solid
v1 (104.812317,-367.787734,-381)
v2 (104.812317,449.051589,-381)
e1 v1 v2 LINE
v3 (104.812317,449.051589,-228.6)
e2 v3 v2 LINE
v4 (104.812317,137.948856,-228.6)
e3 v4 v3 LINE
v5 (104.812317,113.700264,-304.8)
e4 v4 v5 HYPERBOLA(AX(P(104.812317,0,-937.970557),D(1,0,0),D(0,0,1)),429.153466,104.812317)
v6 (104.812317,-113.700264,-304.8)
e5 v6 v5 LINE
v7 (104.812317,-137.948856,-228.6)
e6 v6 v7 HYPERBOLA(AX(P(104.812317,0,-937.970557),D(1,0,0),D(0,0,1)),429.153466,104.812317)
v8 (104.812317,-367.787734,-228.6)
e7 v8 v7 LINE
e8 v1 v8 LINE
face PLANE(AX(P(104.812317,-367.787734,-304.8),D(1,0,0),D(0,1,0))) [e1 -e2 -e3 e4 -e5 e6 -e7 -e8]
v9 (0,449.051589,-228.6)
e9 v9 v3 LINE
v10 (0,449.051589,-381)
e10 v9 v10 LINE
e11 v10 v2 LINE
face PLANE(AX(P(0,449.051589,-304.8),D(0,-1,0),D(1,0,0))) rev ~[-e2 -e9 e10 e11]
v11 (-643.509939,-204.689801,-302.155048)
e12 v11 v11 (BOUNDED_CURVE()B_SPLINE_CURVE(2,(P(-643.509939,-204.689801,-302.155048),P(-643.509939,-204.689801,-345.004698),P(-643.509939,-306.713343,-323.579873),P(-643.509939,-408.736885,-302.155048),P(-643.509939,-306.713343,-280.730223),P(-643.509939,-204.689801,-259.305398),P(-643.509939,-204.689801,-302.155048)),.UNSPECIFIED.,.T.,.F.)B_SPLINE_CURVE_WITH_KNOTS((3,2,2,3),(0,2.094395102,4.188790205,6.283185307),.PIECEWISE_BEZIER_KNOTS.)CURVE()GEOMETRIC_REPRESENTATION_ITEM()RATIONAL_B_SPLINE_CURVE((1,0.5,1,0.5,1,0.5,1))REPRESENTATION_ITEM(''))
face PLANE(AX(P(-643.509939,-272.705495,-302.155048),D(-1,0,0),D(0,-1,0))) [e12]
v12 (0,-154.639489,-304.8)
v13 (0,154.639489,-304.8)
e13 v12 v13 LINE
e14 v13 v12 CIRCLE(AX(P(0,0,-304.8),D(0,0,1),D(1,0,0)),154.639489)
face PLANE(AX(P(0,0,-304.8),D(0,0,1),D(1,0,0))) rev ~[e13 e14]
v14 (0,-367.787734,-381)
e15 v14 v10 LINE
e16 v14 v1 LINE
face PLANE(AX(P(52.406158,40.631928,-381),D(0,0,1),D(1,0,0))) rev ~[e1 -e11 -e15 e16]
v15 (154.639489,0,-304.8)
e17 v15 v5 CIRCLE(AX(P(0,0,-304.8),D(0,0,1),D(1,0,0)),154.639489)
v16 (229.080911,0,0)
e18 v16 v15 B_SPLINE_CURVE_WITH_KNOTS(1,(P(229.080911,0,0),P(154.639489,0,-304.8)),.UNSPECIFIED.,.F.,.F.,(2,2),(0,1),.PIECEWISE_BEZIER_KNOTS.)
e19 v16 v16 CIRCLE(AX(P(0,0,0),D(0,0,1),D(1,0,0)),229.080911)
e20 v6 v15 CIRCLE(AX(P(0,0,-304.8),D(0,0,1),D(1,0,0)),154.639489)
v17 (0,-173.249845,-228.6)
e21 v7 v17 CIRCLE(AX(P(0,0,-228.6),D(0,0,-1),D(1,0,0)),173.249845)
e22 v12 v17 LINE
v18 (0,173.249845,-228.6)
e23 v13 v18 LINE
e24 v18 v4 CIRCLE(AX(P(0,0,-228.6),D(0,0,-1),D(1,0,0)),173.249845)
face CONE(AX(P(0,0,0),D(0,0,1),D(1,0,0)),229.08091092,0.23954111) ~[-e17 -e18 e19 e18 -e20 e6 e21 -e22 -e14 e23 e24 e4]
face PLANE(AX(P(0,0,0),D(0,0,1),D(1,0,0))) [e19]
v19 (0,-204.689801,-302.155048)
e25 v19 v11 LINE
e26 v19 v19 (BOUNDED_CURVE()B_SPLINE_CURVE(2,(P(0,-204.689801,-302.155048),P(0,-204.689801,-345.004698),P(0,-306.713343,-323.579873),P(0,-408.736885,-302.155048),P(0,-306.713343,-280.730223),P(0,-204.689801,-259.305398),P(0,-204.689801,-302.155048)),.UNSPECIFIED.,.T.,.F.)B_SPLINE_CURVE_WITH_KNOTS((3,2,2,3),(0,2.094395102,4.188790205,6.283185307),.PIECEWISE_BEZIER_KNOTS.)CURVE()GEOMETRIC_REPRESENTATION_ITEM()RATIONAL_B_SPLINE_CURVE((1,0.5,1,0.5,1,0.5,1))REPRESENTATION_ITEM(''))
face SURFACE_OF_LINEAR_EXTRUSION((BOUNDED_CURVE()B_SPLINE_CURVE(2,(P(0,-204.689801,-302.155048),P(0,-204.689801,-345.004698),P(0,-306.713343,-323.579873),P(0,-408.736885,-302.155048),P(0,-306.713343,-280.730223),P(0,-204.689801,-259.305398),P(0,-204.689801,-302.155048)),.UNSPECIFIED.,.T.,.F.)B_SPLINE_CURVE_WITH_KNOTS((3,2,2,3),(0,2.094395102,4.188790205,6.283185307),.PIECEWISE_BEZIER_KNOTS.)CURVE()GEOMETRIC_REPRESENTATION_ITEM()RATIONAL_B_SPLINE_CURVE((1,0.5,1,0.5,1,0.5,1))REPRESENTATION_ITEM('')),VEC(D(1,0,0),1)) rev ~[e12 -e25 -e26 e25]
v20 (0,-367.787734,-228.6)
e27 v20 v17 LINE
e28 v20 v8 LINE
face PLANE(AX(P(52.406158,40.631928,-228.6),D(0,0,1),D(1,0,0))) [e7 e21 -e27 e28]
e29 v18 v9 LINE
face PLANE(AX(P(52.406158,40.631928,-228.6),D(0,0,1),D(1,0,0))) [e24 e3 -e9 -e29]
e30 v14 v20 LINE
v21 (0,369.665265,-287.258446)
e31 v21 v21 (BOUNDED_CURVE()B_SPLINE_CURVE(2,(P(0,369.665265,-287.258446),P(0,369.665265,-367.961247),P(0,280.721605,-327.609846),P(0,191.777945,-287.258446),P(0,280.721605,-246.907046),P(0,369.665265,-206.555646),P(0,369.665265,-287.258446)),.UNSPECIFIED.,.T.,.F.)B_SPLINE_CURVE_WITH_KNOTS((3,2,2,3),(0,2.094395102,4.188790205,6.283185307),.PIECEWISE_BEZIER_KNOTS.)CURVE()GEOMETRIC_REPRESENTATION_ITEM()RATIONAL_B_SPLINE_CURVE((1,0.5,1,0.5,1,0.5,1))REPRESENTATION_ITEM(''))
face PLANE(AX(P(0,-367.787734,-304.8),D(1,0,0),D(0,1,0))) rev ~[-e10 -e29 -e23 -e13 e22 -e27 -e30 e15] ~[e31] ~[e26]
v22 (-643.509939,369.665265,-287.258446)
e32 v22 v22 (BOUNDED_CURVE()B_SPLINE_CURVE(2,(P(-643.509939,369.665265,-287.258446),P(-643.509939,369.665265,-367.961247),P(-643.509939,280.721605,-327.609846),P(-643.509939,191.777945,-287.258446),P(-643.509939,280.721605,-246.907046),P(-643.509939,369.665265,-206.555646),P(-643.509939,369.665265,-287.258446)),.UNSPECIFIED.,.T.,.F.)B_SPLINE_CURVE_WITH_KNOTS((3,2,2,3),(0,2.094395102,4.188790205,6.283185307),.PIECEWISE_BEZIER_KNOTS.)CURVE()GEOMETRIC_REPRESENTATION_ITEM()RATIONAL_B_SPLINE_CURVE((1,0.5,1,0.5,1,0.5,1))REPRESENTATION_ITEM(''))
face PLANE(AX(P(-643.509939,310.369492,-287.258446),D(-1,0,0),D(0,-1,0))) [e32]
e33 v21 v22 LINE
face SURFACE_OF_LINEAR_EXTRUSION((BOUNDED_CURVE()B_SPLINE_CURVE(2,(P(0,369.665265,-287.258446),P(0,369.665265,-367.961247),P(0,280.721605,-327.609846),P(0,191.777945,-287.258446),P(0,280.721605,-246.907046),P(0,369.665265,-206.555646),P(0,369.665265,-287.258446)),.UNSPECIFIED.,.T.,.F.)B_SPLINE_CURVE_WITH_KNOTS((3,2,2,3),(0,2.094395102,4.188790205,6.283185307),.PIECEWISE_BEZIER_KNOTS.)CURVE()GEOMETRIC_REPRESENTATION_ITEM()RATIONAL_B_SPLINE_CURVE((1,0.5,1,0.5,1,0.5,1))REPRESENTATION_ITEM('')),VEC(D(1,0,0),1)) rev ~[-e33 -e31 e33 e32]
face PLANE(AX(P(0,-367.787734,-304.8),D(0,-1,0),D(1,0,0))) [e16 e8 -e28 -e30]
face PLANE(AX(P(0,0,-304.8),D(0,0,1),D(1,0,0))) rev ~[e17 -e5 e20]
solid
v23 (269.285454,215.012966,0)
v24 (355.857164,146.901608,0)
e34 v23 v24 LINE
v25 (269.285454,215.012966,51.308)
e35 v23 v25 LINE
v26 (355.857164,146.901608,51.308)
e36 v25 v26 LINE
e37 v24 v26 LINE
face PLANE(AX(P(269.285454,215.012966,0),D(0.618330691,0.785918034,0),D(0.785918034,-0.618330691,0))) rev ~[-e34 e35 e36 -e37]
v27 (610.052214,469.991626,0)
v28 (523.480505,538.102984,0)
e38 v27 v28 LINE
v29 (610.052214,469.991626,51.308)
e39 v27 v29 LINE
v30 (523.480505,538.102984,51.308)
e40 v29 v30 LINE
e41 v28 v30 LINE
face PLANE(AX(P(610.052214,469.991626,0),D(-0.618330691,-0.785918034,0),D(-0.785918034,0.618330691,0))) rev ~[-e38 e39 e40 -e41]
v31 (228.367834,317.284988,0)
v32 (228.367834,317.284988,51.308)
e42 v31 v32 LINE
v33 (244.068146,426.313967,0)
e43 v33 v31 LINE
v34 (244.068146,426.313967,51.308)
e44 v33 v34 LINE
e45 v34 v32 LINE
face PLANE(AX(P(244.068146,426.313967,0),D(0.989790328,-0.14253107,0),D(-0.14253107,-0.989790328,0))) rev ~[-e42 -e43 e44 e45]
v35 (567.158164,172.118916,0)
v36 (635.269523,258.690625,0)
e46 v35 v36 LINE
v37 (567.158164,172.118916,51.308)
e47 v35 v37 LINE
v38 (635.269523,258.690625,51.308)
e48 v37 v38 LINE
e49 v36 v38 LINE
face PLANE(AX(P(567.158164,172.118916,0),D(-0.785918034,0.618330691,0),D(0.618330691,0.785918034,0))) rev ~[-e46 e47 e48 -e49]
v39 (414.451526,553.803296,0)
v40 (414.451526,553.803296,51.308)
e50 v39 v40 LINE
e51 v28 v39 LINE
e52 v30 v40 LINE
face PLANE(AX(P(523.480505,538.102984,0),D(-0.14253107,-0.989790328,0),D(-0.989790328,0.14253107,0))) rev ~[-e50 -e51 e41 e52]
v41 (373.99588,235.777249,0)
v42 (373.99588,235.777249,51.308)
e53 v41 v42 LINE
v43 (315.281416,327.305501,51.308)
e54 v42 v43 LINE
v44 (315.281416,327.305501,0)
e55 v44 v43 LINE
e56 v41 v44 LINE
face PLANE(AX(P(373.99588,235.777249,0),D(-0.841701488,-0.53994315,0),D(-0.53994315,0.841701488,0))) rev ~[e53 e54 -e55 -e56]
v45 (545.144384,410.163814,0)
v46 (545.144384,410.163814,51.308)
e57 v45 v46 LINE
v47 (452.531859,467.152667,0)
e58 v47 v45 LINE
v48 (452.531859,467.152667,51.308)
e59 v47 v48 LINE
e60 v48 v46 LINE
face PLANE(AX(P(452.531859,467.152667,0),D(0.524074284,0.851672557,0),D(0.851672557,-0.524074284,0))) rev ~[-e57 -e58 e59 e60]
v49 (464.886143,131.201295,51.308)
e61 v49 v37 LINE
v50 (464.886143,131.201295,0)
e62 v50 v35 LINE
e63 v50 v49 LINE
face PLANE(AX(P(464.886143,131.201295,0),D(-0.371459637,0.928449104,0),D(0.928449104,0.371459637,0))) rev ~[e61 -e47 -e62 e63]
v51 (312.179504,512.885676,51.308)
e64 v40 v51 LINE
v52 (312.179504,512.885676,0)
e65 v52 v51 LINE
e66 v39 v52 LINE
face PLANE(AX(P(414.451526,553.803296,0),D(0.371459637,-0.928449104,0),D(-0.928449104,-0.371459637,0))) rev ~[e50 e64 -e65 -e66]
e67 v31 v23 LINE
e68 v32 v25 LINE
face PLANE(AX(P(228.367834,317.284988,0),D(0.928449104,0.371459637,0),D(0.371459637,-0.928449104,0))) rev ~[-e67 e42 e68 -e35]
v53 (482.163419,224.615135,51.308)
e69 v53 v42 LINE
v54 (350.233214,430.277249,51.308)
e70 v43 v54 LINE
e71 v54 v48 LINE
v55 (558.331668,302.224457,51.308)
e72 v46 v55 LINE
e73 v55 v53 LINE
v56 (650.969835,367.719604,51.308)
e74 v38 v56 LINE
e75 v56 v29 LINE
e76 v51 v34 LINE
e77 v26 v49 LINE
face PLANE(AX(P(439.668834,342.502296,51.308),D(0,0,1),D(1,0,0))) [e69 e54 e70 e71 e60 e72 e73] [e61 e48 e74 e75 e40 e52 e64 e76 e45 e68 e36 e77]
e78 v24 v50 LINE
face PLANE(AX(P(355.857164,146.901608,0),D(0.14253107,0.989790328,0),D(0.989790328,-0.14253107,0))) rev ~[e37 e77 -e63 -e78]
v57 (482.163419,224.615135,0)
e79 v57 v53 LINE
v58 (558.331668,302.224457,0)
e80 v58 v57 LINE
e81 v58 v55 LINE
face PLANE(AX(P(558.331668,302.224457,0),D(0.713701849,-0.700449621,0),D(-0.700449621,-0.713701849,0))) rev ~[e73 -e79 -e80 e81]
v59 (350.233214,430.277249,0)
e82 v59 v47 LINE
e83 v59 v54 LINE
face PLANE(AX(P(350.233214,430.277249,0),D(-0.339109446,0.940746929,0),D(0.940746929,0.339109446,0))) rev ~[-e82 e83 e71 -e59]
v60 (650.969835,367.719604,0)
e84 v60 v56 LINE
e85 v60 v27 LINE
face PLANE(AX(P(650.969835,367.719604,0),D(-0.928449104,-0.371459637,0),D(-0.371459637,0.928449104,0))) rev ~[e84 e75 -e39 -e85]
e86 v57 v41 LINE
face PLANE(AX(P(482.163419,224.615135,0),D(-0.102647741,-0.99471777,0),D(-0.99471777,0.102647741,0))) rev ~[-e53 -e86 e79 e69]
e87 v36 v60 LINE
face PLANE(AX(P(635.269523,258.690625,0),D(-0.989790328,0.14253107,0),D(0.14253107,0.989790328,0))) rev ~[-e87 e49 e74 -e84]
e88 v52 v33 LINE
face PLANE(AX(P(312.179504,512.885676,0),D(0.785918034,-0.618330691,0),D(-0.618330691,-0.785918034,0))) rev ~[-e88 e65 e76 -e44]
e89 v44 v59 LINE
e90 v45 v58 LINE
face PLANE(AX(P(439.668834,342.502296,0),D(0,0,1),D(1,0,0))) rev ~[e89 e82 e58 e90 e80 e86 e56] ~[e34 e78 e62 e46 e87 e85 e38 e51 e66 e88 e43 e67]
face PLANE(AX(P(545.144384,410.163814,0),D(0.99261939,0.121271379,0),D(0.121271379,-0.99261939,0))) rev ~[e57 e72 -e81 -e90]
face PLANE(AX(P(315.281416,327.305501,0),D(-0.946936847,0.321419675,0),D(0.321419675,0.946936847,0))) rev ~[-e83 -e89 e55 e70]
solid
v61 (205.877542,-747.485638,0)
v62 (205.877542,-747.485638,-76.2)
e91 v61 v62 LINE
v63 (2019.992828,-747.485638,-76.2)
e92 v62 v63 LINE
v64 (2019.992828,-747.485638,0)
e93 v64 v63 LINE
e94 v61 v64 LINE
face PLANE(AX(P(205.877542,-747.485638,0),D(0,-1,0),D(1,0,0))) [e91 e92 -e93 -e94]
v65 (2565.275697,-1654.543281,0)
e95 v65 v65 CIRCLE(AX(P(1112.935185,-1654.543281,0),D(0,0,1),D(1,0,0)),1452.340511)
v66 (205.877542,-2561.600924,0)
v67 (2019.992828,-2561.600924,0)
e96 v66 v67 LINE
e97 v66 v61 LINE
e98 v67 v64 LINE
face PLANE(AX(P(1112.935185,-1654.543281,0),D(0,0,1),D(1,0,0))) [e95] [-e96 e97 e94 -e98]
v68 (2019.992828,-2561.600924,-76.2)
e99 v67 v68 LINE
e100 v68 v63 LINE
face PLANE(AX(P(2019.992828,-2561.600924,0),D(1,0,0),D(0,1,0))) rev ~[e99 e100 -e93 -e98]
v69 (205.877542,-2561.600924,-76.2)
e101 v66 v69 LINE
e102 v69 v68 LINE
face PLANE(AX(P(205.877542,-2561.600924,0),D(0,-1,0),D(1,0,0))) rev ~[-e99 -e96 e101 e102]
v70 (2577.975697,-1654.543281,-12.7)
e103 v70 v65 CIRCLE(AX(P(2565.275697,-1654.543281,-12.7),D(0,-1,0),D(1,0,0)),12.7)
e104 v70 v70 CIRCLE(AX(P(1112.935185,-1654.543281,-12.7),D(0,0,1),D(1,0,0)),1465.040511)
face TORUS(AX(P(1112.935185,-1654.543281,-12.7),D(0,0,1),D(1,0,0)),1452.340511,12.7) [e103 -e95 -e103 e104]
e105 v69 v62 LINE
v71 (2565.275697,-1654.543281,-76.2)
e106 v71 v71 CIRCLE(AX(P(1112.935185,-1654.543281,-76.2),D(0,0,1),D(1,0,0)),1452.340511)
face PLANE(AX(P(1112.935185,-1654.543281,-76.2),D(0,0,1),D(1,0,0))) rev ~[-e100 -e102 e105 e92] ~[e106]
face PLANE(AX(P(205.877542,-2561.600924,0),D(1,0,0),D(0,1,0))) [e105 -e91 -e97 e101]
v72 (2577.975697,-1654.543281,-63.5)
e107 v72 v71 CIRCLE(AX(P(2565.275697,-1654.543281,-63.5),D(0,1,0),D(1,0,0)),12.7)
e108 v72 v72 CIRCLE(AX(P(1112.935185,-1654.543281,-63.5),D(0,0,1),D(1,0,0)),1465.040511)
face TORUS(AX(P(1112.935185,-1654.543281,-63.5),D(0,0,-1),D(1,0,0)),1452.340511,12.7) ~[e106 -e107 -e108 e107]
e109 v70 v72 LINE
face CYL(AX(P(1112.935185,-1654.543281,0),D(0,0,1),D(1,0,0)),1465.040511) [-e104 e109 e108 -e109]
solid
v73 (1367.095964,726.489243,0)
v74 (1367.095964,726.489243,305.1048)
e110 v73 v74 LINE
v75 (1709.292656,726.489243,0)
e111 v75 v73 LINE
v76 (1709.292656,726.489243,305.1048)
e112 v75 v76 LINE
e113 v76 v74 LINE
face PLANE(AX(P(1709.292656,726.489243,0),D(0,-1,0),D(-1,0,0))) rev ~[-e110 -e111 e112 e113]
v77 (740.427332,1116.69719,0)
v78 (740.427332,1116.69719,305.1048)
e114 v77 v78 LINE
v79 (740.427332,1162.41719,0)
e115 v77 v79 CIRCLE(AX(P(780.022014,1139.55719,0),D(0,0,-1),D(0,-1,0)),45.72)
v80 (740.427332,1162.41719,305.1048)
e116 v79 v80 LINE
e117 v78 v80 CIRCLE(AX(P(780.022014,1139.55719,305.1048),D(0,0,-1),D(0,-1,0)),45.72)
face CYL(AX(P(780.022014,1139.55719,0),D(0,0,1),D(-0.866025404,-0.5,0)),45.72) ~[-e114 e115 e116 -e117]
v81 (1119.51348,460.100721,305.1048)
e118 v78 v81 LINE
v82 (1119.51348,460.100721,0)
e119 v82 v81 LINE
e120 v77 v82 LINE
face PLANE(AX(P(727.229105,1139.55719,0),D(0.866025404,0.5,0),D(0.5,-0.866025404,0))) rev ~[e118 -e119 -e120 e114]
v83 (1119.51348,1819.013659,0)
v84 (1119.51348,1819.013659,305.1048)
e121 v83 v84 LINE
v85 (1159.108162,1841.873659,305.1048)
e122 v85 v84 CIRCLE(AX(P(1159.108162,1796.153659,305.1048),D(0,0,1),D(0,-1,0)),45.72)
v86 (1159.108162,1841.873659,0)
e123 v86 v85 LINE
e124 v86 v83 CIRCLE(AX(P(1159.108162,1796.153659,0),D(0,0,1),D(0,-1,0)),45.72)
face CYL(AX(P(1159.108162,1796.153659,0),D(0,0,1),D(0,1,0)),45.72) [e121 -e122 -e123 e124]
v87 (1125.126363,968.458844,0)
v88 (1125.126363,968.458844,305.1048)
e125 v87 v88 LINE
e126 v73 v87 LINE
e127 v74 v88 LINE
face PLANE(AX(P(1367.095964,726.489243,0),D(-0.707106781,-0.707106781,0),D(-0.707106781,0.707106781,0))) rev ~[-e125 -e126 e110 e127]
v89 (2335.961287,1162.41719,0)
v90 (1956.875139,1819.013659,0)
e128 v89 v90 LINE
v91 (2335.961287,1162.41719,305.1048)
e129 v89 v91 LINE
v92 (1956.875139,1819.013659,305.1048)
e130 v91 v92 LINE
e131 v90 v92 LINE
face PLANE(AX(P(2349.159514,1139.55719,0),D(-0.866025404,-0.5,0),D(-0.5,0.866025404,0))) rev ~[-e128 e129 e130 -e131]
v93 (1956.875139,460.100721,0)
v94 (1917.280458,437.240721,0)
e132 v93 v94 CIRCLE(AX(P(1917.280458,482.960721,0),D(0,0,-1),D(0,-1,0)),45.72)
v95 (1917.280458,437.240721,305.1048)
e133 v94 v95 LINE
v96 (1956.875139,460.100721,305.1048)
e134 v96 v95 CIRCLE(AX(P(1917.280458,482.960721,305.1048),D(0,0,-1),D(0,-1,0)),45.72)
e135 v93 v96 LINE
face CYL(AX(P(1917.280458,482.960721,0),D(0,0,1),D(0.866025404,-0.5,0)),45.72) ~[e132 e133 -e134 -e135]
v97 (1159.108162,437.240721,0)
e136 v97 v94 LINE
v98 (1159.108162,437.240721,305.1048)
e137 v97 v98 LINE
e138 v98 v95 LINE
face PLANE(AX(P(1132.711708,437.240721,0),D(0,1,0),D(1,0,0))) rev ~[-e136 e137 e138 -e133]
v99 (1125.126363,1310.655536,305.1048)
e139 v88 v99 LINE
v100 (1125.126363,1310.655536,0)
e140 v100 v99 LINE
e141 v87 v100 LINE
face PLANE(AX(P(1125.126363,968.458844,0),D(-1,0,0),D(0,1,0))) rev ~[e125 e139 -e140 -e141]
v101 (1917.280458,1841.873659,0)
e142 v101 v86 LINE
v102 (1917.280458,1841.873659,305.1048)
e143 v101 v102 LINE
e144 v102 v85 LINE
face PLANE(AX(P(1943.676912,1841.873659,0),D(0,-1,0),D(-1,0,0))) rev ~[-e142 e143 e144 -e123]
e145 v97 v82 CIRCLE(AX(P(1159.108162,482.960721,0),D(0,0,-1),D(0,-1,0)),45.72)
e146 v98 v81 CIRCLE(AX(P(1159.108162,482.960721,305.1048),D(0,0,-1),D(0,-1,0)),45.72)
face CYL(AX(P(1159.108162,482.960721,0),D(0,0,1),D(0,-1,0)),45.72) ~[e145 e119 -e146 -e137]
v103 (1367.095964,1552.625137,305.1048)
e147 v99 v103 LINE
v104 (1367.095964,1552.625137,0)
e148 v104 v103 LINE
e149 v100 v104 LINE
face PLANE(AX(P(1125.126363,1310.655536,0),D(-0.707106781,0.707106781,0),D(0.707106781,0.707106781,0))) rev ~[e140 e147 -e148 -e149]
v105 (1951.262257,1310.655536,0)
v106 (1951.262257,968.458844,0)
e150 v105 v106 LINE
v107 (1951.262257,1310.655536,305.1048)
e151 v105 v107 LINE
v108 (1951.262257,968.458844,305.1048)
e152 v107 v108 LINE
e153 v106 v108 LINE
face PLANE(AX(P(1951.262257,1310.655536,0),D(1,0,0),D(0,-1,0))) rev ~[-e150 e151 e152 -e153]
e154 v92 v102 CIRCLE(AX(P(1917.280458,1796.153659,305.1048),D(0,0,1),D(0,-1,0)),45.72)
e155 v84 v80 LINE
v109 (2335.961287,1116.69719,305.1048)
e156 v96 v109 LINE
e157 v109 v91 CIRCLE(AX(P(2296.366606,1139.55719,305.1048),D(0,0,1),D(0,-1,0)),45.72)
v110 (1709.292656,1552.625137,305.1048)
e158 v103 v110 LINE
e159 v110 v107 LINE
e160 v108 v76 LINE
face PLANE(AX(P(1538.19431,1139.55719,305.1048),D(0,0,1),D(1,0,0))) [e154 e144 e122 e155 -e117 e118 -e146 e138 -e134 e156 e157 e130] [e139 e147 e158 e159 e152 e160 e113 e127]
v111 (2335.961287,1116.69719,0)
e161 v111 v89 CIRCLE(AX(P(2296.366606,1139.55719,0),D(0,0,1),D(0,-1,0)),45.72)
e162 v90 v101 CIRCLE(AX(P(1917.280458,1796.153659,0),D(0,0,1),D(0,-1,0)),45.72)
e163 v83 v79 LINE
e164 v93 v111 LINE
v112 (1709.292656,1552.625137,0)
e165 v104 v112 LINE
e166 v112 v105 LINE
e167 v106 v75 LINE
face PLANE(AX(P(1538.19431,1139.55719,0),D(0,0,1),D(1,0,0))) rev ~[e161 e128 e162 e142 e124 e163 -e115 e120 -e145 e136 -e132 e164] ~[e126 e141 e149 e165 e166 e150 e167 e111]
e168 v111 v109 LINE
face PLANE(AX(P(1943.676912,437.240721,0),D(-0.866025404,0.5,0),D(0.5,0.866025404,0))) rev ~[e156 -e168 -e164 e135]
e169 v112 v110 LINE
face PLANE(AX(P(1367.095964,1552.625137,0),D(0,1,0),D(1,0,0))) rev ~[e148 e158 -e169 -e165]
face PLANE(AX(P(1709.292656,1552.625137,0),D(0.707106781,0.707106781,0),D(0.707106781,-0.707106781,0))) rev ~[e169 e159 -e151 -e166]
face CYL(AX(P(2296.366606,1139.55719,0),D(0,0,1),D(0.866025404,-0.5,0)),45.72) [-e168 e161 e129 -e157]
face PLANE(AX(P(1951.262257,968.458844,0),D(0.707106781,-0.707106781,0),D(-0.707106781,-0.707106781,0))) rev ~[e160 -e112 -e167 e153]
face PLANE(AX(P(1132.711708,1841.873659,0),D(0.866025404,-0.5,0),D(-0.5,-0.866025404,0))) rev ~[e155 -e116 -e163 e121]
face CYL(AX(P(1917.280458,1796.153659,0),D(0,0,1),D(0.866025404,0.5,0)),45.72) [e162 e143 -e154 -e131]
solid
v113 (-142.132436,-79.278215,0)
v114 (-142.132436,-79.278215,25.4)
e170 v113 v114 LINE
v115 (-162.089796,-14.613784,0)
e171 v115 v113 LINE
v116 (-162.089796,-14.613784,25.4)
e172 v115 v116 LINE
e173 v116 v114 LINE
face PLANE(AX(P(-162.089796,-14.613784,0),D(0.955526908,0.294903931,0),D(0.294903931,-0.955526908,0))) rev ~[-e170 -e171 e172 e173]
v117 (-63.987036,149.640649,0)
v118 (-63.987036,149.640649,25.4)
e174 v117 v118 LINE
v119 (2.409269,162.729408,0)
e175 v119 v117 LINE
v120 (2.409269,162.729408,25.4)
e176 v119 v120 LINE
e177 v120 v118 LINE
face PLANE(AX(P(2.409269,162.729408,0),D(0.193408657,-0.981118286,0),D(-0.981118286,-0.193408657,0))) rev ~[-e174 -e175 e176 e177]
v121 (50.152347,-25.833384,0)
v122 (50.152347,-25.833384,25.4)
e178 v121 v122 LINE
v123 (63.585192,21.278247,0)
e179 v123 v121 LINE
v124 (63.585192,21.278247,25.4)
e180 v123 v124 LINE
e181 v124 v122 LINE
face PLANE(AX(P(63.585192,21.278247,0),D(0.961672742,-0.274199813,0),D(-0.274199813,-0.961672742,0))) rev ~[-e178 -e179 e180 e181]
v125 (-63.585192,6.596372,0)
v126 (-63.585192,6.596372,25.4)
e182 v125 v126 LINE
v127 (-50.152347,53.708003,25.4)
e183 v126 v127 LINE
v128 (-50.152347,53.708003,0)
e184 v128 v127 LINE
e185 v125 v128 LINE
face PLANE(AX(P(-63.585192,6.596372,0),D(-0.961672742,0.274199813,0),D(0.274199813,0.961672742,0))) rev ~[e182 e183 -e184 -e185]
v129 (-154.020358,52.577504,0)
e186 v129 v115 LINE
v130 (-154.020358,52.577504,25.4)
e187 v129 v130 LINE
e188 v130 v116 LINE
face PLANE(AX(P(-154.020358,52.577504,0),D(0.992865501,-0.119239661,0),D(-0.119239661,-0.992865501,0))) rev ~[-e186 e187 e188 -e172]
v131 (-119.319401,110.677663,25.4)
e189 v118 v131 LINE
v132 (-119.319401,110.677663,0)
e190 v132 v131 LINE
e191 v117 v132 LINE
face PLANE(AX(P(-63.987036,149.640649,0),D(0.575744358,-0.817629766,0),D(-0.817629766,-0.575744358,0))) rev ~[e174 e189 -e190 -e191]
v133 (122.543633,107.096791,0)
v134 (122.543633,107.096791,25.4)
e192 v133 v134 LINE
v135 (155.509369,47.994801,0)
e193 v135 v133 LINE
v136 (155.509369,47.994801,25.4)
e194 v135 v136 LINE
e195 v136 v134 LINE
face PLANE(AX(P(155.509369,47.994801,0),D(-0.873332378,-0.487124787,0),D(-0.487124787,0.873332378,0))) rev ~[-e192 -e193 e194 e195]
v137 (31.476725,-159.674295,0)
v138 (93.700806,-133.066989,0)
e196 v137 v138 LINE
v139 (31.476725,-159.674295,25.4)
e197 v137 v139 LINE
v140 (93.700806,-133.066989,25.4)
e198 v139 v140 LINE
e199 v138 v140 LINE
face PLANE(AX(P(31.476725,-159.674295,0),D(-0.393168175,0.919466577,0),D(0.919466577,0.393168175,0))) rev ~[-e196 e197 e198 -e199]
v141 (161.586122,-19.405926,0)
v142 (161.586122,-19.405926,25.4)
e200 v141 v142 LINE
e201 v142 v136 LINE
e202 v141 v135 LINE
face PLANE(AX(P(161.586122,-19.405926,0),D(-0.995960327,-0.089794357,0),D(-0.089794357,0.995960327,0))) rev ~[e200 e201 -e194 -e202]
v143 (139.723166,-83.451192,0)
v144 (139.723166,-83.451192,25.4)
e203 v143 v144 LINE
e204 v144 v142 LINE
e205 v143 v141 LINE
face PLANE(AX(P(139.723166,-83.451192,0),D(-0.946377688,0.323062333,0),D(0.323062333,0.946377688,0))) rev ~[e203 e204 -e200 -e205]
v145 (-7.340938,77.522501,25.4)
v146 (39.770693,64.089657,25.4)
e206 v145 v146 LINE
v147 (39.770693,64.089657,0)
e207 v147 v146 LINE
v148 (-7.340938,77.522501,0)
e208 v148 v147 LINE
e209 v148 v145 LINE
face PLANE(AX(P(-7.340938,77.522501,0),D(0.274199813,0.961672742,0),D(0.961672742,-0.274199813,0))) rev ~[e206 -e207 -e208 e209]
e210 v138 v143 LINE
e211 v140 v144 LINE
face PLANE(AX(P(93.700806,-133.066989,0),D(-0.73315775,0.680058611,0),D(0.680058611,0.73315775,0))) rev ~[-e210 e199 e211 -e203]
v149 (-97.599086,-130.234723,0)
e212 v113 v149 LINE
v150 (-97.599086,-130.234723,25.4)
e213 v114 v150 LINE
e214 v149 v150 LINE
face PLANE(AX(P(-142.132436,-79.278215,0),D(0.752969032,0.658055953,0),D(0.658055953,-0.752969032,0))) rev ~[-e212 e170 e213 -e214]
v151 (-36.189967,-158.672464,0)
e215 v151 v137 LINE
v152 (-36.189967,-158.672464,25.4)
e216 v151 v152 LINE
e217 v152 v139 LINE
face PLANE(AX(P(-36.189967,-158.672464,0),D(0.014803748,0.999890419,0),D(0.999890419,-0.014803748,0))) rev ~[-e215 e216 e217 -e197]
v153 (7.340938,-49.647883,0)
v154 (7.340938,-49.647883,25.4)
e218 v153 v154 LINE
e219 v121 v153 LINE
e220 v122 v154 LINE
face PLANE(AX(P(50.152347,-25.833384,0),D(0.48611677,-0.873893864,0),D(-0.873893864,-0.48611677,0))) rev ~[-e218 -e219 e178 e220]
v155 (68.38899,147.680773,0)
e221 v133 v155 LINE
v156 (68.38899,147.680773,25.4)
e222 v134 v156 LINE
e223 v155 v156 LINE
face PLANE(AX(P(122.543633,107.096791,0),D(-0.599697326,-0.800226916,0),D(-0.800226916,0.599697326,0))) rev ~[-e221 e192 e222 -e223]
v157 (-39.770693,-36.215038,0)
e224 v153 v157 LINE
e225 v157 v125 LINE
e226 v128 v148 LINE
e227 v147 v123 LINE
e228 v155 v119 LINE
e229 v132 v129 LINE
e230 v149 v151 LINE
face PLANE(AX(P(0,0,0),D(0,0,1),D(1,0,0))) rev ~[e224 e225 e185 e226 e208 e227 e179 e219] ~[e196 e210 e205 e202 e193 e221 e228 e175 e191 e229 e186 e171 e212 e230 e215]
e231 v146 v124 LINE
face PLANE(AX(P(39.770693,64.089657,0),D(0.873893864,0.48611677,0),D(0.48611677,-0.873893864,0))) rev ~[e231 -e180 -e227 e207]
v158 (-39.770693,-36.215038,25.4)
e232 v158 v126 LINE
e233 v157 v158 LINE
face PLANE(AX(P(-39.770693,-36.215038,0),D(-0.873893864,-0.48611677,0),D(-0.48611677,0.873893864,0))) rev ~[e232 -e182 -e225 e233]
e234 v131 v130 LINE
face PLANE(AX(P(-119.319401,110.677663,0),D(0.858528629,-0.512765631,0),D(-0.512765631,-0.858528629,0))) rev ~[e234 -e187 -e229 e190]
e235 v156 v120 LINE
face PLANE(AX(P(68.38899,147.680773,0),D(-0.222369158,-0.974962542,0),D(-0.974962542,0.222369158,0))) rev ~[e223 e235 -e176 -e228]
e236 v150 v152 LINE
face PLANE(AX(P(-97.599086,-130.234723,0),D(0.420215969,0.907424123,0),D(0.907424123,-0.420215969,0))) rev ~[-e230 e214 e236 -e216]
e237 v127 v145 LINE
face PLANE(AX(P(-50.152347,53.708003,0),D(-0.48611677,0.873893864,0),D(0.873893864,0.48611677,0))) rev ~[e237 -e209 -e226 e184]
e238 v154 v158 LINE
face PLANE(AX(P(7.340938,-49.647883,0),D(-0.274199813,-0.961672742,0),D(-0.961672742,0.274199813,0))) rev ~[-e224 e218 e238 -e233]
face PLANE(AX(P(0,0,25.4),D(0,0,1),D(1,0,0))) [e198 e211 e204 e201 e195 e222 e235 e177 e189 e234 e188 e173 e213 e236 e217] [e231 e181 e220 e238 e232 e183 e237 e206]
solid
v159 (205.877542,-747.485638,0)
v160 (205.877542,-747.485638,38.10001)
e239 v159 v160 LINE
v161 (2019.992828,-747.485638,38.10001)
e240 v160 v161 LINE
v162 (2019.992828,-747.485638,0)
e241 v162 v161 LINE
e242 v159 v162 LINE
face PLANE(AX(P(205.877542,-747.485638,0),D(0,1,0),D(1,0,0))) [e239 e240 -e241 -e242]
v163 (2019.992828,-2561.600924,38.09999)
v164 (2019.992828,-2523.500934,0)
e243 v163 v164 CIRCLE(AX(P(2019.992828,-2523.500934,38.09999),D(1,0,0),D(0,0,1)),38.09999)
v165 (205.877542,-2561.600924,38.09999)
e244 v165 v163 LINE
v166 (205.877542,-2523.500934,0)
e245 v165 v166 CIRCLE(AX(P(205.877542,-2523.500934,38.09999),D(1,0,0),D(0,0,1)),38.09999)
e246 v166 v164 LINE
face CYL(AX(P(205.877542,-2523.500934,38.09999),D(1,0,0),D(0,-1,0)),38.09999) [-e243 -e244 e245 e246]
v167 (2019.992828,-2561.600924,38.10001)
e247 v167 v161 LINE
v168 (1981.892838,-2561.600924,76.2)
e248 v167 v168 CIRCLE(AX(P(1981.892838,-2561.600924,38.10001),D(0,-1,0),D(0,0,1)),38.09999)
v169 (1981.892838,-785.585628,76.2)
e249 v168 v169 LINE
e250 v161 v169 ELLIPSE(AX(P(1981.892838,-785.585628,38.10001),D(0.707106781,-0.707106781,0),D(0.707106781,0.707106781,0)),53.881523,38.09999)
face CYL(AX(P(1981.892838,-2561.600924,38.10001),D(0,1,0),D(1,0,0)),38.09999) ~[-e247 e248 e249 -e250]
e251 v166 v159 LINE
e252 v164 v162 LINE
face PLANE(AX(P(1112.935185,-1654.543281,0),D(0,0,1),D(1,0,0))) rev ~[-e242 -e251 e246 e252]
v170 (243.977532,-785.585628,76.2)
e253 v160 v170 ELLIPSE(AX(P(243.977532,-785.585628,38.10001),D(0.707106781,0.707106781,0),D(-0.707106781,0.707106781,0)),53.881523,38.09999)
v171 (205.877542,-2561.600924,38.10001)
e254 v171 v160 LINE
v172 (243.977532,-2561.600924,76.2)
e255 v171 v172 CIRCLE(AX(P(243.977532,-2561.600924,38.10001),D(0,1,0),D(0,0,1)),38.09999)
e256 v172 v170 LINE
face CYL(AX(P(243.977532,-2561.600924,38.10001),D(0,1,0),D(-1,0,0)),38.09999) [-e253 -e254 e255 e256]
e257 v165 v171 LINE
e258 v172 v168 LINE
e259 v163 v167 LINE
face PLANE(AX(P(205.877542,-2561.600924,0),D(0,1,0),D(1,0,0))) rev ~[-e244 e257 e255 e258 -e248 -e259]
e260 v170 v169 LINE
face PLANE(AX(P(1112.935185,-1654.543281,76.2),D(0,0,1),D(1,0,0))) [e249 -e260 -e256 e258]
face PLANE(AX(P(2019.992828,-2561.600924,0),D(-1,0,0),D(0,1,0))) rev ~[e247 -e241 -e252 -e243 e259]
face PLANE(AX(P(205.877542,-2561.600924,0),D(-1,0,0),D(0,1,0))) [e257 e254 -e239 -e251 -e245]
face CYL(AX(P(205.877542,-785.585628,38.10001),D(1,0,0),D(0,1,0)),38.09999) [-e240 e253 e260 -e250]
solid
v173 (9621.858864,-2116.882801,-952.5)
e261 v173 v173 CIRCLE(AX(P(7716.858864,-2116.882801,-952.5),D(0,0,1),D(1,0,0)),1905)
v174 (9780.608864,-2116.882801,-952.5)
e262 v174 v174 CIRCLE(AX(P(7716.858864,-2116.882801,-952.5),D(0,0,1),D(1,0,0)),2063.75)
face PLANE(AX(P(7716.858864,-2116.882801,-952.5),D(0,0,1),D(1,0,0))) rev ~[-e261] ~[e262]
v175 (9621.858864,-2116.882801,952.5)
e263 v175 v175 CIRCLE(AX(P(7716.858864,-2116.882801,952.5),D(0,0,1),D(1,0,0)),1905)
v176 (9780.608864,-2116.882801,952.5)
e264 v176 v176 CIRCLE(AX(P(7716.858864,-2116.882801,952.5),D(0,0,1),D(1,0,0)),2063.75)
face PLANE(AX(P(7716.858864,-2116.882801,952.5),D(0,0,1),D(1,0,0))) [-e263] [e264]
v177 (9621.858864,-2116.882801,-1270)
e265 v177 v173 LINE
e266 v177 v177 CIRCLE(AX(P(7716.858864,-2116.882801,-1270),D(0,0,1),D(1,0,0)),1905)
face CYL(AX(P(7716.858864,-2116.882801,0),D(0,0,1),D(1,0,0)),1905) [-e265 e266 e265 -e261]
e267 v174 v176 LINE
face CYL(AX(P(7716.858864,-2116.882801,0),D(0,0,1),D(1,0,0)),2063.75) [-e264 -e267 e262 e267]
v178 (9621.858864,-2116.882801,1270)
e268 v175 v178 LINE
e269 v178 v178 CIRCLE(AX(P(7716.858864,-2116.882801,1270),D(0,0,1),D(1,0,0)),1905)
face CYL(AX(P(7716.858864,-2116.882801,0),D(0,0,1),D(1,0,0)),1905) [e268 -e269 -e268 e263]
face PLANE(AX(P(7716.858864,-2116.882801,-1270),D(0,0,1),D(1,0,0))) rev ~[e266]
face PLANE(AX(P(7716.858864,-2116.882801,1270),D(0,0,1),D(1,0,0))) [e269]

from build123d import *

# Parameters (mm, degrees)
F1_DEPTH  = 25.4
F3_DEPTH  = 51.308
F5_DEPTH  = 305.1048
F6_R      = 45.72
F7_R      = 1465.0405111475
F7_W      = 1814.1152858734
F7_H      = 1814.1152858734
F8_DEPTH  = 76.2
F9_DEPTH  = 76.2
F10_R     = 38.09999
F11_R     = 12.7
F12_R     = 1905
F13_DEPTH = 1270
F12_R_2   = 2063.75
F14_DEPTH = 952.5
F19_R     = 229.0809109199
F21_R     = 154.6394893279
F23_W     = 104.8123165965
F23_H     = 816.8393224478
F24_DEPTH = 76.2
F26_DEPTH = 643.5099393129


# Not quite as in the source:
# - a fillet or chamfer is up to 0.001 mm smaller than in the source, because OpenCascade refuses the exact size
# - the program builds the solid bodies; features that only make, move or delete a surface that nothing else refers to are left out


with BuildPart() as f1:
    # F0 (on Top) → F1 (new body)
    with BuildSketch(Plane.XY):
        Polygon((155.50936864, 47.9948012801), (122.5436329842, 107.0967912674), (68.3889899114, 147.6807731007), (2.4092691885, 162.7294076272), (-63.9870360646, 149.6406492247), (-119.3194014782, 110.6776631286), (-154.0203583934, 52.5775036026), (-162.0897961115, -14.6137839479), (-142.1324355422, -79.2782154918), (-97.5990856351, -130.2347233572), (-36.1899671618, -158.6724644088), (31.4767254093, -159.67429487), (93.7008062, -133.0669891528), (139.7231663537, -83.4511921354), (161.5861216997, -19.4059258675), align=None)
        Polygon((39.7706934855, 64.0896567419), (63.5851919651, 21.2782472372), (50.1523473576, -25.8333841012), (7.3409378529, -49.6478825808), (-39.7706934855, -36.2150379733), (-63.5851919651, 6.5963715315), (-50.1523473576, 53.7080028699), (-7.3409378529, 77.5225013494), align=None, mode=Mode.SUBTRACT)
    extrude(amount=F1_DEPTH)


with BuildPart() as f3:
    # F2 (on Top) → F3 (new body)
    with BuildSketch(Plane.XY):
        Polygon((567.1581641405, 172.1189159194), (635.2695226669, 258.6906254292), (650.9698346822, 367.7196043769), (610.052214261, 469.9916259019), (523.4805047512, 538.1029844284), (414.4515258035, 553.8032964437), (312.1795042784, 512.8856760224), (244.068145752, 426.3139665127), (228.3678337366, 317.284987565), (269.2854541579, 215.0129660399), (355.8571636677, 146.9016075134), (464.8861426154, 131.2012954981), align=None)
        Polygon((545.1443835194, 410.1638138472), (558.3316683769, 302.2244572639), (482.1634188256, 224.6151347452), (373.9958803268, 235.7772490893), (315.2814155857, 327.3055005294), (350.2332141092, 430.2772488952), (452.5318587224, 467.1526674262), align=None, mode=Mode.SUBTRACT)
    extrude(amount=F3_DEPTH)


with BuildPart() as f5:
    # F4 (on Top) → F5 (new body)
    with BuildSketch(Plane.XY):
        Polygon((1943.6769121667, 437.2407213386), (2349.1595144473, 1139.5571900737), (1943.6769121667, 1841.8736588088), (1132.7117076057, 1841.8736588088), (727.2291053252, 1139.5571900737), (1132.7117076057, 437.2407213386), align=None)
        Polygon((1709.2926557119, 1552.6251370658), (1951.2622568783, 1310.6555358994), (1951.2622568783, 968.458844248), (1709.2926557119, 726.4892430816), (1367.0959640605, 726.4892430816), (1125.1263628941, 968.458844248), (1125.1263628941, 1310.6555358994), (1367.0959640605, 1552.6251370658), align=None, mode=Mode.SUBTRACT)
    extrude(amount=F5_DEPTH)

    # F6
    f6_edges = [f5.edges().sort_by_distance(p)[0] for p in [
        (1943.676912, 437.240721, 152.5524),
        (2349.159514, 1139.55719, 152.5524),
        (1943.676912, 1841.873659, 152.5524),
        (1132.711708, 1841.873659, 152.5524),
        (727.229105, 1139.55719, 152.5524),
        (1132.711708, 437.240721, 152.5524),
    ]]
    fillet(f6_edges, radius=F6_R)


with BuildPart() as f8:
    # F7 (on Top) → F8 (new body)
    with BuildSketch(Plane.XY):
        with Locations((1112.9351854324, -1654.5432806015)):
            Circle(F7_R)
        with Locations((1112.9351854324, -1654.5432806015)):
            Rectangle(F7_W, F7_H, mode=Mode.SUBTRACT)
    extrude(amount=-F8_DEPTH)

    # F11
    f11_edges = [f8.edges().sort_by_distance(p)[0] for p in [
        (-352.105326, -1654.543281, 0),
        (-352.105326, -1654.543281, -76.2),
    ]]
    fillet(f11_edges, radius=F11_R)


with BuildPart() as f9:
    # F7 (on Top) → F9 (new body)
    with BuildSketch(Plane.XY):
        with Locations((1112.9351854324, -1654.5432806015)):
            Rectangle(F7_W, F7_H)
    extrude(amount=F9_DEPTH)

    # F10 (radius 38.1 in the source; OpenCascade refuses exactly that, so slightly less here)
    f10_edges = [f9.edges().sort_by_distance(p)[0] for p in [
        (205.877542, -1654.543281, 76.2),
        (2019.992828, -1654.543281, 76.2),
        (1112.935185, -2561.600924, 0),
        (1112.935185, -747.485638, 76.2),
    ]]
    fillet(f10_edges, radius=F10_R)


with BuildPart() as f13:
    # F12 (on Top) → F13 (new body, symmetric)
    with BuildSketch(Plane.XY):
        with Locations((7716.8588638306, -2116.8828010559)):
            Circle(F12_R)
    extrude(amount=F13_DEPTH, both=True)

    # F12 (on Top) → F14 (join, symmetric)
    with BuildSketch(Plane.XY):
        with Locations((7716.8588638306, -2116.8828010559)):
            Circle(F12_R_2)
        with Locations((7716.8588638306, -2116.8828010559)):
            Circle(F12_R, mode=Mode.SUBTRACT)
    extrude(amount=F14_DEPTH, both=True)


with BuildPart() as f22:
    # F19 (on Top) → F22 section 0
    with BuildSketch(Plane.XY):
        Circle(F19_R)
    # F21 (on offset) → F22 section 1
    with BuildSketch(Plane.XY.offset(-304.8)):
        Circle(F21_R)
    loft()

    # F23 (on offset) → F24 (join, symmetric)
    with BuildSketch(Plane.XY.offset(-304.8)):
        with Locations((52.4061582983, 40.6319275498)):
            Rectangle(F23_W, F23_H)
    extrude(amount=F24_DEPTH, both=True)

    # F25 (on face) → F26 (join)
    with BuildSketch(Plane(origin=(0, 0, 0), x_dir=(0, -1, 0), z_dir=(-1, 0, 0))):
        with BuildLine():
            add(Edge.make_bspline(
                [(204.6898007393, -302.1550476551), (204.6898007393, -345.0046976312), (306.7133426666, -323.5798726431), (408.736884594, -302.1550476551), (306.7133426666, -280.7302226671), (204.6898007393, -259.305397679), (204.6898007393, -302.1550476551)],
                knots=[0, 0, 0, 2.0943951024, 2.0943951024, 4.1887902048, 4.1887902048, 6.2831853072, 6.2831853072, 6.2831853072], degree=2, weights=[1, 0.5, 1, 0.5, 1, 0.5, 1]))
        make_face()
        with BuildLine():
            add(Edge.make_bspline(
                [(-369.6652650833, -287.2584462166), (-369.6652650833, -367.9612465382), (-280.7216048241, -327.6098463774), (-191.7779445648, -287.2584462166), (-280.7216048241, -246.9070460558), (-369.6652650833, -206.555645895), (-369.6652650833, -287.2584462166)],
                knots=[0, 0, 0, 2.0943951024, 2.0943951024, 4.1887902048, 4.1887902048, 6.2831853072, 6.2831853072, 6.2831853072], degree=2, weights=[1, 0.5, 1, 0.5, 1, 0.5, 1]))
        make_face()
    extrude(amount=F26_DEPTH)


solid = Compound([f1.part, f3.part, f5.part, f8.part, f9.part, f13.part, f22.part])
